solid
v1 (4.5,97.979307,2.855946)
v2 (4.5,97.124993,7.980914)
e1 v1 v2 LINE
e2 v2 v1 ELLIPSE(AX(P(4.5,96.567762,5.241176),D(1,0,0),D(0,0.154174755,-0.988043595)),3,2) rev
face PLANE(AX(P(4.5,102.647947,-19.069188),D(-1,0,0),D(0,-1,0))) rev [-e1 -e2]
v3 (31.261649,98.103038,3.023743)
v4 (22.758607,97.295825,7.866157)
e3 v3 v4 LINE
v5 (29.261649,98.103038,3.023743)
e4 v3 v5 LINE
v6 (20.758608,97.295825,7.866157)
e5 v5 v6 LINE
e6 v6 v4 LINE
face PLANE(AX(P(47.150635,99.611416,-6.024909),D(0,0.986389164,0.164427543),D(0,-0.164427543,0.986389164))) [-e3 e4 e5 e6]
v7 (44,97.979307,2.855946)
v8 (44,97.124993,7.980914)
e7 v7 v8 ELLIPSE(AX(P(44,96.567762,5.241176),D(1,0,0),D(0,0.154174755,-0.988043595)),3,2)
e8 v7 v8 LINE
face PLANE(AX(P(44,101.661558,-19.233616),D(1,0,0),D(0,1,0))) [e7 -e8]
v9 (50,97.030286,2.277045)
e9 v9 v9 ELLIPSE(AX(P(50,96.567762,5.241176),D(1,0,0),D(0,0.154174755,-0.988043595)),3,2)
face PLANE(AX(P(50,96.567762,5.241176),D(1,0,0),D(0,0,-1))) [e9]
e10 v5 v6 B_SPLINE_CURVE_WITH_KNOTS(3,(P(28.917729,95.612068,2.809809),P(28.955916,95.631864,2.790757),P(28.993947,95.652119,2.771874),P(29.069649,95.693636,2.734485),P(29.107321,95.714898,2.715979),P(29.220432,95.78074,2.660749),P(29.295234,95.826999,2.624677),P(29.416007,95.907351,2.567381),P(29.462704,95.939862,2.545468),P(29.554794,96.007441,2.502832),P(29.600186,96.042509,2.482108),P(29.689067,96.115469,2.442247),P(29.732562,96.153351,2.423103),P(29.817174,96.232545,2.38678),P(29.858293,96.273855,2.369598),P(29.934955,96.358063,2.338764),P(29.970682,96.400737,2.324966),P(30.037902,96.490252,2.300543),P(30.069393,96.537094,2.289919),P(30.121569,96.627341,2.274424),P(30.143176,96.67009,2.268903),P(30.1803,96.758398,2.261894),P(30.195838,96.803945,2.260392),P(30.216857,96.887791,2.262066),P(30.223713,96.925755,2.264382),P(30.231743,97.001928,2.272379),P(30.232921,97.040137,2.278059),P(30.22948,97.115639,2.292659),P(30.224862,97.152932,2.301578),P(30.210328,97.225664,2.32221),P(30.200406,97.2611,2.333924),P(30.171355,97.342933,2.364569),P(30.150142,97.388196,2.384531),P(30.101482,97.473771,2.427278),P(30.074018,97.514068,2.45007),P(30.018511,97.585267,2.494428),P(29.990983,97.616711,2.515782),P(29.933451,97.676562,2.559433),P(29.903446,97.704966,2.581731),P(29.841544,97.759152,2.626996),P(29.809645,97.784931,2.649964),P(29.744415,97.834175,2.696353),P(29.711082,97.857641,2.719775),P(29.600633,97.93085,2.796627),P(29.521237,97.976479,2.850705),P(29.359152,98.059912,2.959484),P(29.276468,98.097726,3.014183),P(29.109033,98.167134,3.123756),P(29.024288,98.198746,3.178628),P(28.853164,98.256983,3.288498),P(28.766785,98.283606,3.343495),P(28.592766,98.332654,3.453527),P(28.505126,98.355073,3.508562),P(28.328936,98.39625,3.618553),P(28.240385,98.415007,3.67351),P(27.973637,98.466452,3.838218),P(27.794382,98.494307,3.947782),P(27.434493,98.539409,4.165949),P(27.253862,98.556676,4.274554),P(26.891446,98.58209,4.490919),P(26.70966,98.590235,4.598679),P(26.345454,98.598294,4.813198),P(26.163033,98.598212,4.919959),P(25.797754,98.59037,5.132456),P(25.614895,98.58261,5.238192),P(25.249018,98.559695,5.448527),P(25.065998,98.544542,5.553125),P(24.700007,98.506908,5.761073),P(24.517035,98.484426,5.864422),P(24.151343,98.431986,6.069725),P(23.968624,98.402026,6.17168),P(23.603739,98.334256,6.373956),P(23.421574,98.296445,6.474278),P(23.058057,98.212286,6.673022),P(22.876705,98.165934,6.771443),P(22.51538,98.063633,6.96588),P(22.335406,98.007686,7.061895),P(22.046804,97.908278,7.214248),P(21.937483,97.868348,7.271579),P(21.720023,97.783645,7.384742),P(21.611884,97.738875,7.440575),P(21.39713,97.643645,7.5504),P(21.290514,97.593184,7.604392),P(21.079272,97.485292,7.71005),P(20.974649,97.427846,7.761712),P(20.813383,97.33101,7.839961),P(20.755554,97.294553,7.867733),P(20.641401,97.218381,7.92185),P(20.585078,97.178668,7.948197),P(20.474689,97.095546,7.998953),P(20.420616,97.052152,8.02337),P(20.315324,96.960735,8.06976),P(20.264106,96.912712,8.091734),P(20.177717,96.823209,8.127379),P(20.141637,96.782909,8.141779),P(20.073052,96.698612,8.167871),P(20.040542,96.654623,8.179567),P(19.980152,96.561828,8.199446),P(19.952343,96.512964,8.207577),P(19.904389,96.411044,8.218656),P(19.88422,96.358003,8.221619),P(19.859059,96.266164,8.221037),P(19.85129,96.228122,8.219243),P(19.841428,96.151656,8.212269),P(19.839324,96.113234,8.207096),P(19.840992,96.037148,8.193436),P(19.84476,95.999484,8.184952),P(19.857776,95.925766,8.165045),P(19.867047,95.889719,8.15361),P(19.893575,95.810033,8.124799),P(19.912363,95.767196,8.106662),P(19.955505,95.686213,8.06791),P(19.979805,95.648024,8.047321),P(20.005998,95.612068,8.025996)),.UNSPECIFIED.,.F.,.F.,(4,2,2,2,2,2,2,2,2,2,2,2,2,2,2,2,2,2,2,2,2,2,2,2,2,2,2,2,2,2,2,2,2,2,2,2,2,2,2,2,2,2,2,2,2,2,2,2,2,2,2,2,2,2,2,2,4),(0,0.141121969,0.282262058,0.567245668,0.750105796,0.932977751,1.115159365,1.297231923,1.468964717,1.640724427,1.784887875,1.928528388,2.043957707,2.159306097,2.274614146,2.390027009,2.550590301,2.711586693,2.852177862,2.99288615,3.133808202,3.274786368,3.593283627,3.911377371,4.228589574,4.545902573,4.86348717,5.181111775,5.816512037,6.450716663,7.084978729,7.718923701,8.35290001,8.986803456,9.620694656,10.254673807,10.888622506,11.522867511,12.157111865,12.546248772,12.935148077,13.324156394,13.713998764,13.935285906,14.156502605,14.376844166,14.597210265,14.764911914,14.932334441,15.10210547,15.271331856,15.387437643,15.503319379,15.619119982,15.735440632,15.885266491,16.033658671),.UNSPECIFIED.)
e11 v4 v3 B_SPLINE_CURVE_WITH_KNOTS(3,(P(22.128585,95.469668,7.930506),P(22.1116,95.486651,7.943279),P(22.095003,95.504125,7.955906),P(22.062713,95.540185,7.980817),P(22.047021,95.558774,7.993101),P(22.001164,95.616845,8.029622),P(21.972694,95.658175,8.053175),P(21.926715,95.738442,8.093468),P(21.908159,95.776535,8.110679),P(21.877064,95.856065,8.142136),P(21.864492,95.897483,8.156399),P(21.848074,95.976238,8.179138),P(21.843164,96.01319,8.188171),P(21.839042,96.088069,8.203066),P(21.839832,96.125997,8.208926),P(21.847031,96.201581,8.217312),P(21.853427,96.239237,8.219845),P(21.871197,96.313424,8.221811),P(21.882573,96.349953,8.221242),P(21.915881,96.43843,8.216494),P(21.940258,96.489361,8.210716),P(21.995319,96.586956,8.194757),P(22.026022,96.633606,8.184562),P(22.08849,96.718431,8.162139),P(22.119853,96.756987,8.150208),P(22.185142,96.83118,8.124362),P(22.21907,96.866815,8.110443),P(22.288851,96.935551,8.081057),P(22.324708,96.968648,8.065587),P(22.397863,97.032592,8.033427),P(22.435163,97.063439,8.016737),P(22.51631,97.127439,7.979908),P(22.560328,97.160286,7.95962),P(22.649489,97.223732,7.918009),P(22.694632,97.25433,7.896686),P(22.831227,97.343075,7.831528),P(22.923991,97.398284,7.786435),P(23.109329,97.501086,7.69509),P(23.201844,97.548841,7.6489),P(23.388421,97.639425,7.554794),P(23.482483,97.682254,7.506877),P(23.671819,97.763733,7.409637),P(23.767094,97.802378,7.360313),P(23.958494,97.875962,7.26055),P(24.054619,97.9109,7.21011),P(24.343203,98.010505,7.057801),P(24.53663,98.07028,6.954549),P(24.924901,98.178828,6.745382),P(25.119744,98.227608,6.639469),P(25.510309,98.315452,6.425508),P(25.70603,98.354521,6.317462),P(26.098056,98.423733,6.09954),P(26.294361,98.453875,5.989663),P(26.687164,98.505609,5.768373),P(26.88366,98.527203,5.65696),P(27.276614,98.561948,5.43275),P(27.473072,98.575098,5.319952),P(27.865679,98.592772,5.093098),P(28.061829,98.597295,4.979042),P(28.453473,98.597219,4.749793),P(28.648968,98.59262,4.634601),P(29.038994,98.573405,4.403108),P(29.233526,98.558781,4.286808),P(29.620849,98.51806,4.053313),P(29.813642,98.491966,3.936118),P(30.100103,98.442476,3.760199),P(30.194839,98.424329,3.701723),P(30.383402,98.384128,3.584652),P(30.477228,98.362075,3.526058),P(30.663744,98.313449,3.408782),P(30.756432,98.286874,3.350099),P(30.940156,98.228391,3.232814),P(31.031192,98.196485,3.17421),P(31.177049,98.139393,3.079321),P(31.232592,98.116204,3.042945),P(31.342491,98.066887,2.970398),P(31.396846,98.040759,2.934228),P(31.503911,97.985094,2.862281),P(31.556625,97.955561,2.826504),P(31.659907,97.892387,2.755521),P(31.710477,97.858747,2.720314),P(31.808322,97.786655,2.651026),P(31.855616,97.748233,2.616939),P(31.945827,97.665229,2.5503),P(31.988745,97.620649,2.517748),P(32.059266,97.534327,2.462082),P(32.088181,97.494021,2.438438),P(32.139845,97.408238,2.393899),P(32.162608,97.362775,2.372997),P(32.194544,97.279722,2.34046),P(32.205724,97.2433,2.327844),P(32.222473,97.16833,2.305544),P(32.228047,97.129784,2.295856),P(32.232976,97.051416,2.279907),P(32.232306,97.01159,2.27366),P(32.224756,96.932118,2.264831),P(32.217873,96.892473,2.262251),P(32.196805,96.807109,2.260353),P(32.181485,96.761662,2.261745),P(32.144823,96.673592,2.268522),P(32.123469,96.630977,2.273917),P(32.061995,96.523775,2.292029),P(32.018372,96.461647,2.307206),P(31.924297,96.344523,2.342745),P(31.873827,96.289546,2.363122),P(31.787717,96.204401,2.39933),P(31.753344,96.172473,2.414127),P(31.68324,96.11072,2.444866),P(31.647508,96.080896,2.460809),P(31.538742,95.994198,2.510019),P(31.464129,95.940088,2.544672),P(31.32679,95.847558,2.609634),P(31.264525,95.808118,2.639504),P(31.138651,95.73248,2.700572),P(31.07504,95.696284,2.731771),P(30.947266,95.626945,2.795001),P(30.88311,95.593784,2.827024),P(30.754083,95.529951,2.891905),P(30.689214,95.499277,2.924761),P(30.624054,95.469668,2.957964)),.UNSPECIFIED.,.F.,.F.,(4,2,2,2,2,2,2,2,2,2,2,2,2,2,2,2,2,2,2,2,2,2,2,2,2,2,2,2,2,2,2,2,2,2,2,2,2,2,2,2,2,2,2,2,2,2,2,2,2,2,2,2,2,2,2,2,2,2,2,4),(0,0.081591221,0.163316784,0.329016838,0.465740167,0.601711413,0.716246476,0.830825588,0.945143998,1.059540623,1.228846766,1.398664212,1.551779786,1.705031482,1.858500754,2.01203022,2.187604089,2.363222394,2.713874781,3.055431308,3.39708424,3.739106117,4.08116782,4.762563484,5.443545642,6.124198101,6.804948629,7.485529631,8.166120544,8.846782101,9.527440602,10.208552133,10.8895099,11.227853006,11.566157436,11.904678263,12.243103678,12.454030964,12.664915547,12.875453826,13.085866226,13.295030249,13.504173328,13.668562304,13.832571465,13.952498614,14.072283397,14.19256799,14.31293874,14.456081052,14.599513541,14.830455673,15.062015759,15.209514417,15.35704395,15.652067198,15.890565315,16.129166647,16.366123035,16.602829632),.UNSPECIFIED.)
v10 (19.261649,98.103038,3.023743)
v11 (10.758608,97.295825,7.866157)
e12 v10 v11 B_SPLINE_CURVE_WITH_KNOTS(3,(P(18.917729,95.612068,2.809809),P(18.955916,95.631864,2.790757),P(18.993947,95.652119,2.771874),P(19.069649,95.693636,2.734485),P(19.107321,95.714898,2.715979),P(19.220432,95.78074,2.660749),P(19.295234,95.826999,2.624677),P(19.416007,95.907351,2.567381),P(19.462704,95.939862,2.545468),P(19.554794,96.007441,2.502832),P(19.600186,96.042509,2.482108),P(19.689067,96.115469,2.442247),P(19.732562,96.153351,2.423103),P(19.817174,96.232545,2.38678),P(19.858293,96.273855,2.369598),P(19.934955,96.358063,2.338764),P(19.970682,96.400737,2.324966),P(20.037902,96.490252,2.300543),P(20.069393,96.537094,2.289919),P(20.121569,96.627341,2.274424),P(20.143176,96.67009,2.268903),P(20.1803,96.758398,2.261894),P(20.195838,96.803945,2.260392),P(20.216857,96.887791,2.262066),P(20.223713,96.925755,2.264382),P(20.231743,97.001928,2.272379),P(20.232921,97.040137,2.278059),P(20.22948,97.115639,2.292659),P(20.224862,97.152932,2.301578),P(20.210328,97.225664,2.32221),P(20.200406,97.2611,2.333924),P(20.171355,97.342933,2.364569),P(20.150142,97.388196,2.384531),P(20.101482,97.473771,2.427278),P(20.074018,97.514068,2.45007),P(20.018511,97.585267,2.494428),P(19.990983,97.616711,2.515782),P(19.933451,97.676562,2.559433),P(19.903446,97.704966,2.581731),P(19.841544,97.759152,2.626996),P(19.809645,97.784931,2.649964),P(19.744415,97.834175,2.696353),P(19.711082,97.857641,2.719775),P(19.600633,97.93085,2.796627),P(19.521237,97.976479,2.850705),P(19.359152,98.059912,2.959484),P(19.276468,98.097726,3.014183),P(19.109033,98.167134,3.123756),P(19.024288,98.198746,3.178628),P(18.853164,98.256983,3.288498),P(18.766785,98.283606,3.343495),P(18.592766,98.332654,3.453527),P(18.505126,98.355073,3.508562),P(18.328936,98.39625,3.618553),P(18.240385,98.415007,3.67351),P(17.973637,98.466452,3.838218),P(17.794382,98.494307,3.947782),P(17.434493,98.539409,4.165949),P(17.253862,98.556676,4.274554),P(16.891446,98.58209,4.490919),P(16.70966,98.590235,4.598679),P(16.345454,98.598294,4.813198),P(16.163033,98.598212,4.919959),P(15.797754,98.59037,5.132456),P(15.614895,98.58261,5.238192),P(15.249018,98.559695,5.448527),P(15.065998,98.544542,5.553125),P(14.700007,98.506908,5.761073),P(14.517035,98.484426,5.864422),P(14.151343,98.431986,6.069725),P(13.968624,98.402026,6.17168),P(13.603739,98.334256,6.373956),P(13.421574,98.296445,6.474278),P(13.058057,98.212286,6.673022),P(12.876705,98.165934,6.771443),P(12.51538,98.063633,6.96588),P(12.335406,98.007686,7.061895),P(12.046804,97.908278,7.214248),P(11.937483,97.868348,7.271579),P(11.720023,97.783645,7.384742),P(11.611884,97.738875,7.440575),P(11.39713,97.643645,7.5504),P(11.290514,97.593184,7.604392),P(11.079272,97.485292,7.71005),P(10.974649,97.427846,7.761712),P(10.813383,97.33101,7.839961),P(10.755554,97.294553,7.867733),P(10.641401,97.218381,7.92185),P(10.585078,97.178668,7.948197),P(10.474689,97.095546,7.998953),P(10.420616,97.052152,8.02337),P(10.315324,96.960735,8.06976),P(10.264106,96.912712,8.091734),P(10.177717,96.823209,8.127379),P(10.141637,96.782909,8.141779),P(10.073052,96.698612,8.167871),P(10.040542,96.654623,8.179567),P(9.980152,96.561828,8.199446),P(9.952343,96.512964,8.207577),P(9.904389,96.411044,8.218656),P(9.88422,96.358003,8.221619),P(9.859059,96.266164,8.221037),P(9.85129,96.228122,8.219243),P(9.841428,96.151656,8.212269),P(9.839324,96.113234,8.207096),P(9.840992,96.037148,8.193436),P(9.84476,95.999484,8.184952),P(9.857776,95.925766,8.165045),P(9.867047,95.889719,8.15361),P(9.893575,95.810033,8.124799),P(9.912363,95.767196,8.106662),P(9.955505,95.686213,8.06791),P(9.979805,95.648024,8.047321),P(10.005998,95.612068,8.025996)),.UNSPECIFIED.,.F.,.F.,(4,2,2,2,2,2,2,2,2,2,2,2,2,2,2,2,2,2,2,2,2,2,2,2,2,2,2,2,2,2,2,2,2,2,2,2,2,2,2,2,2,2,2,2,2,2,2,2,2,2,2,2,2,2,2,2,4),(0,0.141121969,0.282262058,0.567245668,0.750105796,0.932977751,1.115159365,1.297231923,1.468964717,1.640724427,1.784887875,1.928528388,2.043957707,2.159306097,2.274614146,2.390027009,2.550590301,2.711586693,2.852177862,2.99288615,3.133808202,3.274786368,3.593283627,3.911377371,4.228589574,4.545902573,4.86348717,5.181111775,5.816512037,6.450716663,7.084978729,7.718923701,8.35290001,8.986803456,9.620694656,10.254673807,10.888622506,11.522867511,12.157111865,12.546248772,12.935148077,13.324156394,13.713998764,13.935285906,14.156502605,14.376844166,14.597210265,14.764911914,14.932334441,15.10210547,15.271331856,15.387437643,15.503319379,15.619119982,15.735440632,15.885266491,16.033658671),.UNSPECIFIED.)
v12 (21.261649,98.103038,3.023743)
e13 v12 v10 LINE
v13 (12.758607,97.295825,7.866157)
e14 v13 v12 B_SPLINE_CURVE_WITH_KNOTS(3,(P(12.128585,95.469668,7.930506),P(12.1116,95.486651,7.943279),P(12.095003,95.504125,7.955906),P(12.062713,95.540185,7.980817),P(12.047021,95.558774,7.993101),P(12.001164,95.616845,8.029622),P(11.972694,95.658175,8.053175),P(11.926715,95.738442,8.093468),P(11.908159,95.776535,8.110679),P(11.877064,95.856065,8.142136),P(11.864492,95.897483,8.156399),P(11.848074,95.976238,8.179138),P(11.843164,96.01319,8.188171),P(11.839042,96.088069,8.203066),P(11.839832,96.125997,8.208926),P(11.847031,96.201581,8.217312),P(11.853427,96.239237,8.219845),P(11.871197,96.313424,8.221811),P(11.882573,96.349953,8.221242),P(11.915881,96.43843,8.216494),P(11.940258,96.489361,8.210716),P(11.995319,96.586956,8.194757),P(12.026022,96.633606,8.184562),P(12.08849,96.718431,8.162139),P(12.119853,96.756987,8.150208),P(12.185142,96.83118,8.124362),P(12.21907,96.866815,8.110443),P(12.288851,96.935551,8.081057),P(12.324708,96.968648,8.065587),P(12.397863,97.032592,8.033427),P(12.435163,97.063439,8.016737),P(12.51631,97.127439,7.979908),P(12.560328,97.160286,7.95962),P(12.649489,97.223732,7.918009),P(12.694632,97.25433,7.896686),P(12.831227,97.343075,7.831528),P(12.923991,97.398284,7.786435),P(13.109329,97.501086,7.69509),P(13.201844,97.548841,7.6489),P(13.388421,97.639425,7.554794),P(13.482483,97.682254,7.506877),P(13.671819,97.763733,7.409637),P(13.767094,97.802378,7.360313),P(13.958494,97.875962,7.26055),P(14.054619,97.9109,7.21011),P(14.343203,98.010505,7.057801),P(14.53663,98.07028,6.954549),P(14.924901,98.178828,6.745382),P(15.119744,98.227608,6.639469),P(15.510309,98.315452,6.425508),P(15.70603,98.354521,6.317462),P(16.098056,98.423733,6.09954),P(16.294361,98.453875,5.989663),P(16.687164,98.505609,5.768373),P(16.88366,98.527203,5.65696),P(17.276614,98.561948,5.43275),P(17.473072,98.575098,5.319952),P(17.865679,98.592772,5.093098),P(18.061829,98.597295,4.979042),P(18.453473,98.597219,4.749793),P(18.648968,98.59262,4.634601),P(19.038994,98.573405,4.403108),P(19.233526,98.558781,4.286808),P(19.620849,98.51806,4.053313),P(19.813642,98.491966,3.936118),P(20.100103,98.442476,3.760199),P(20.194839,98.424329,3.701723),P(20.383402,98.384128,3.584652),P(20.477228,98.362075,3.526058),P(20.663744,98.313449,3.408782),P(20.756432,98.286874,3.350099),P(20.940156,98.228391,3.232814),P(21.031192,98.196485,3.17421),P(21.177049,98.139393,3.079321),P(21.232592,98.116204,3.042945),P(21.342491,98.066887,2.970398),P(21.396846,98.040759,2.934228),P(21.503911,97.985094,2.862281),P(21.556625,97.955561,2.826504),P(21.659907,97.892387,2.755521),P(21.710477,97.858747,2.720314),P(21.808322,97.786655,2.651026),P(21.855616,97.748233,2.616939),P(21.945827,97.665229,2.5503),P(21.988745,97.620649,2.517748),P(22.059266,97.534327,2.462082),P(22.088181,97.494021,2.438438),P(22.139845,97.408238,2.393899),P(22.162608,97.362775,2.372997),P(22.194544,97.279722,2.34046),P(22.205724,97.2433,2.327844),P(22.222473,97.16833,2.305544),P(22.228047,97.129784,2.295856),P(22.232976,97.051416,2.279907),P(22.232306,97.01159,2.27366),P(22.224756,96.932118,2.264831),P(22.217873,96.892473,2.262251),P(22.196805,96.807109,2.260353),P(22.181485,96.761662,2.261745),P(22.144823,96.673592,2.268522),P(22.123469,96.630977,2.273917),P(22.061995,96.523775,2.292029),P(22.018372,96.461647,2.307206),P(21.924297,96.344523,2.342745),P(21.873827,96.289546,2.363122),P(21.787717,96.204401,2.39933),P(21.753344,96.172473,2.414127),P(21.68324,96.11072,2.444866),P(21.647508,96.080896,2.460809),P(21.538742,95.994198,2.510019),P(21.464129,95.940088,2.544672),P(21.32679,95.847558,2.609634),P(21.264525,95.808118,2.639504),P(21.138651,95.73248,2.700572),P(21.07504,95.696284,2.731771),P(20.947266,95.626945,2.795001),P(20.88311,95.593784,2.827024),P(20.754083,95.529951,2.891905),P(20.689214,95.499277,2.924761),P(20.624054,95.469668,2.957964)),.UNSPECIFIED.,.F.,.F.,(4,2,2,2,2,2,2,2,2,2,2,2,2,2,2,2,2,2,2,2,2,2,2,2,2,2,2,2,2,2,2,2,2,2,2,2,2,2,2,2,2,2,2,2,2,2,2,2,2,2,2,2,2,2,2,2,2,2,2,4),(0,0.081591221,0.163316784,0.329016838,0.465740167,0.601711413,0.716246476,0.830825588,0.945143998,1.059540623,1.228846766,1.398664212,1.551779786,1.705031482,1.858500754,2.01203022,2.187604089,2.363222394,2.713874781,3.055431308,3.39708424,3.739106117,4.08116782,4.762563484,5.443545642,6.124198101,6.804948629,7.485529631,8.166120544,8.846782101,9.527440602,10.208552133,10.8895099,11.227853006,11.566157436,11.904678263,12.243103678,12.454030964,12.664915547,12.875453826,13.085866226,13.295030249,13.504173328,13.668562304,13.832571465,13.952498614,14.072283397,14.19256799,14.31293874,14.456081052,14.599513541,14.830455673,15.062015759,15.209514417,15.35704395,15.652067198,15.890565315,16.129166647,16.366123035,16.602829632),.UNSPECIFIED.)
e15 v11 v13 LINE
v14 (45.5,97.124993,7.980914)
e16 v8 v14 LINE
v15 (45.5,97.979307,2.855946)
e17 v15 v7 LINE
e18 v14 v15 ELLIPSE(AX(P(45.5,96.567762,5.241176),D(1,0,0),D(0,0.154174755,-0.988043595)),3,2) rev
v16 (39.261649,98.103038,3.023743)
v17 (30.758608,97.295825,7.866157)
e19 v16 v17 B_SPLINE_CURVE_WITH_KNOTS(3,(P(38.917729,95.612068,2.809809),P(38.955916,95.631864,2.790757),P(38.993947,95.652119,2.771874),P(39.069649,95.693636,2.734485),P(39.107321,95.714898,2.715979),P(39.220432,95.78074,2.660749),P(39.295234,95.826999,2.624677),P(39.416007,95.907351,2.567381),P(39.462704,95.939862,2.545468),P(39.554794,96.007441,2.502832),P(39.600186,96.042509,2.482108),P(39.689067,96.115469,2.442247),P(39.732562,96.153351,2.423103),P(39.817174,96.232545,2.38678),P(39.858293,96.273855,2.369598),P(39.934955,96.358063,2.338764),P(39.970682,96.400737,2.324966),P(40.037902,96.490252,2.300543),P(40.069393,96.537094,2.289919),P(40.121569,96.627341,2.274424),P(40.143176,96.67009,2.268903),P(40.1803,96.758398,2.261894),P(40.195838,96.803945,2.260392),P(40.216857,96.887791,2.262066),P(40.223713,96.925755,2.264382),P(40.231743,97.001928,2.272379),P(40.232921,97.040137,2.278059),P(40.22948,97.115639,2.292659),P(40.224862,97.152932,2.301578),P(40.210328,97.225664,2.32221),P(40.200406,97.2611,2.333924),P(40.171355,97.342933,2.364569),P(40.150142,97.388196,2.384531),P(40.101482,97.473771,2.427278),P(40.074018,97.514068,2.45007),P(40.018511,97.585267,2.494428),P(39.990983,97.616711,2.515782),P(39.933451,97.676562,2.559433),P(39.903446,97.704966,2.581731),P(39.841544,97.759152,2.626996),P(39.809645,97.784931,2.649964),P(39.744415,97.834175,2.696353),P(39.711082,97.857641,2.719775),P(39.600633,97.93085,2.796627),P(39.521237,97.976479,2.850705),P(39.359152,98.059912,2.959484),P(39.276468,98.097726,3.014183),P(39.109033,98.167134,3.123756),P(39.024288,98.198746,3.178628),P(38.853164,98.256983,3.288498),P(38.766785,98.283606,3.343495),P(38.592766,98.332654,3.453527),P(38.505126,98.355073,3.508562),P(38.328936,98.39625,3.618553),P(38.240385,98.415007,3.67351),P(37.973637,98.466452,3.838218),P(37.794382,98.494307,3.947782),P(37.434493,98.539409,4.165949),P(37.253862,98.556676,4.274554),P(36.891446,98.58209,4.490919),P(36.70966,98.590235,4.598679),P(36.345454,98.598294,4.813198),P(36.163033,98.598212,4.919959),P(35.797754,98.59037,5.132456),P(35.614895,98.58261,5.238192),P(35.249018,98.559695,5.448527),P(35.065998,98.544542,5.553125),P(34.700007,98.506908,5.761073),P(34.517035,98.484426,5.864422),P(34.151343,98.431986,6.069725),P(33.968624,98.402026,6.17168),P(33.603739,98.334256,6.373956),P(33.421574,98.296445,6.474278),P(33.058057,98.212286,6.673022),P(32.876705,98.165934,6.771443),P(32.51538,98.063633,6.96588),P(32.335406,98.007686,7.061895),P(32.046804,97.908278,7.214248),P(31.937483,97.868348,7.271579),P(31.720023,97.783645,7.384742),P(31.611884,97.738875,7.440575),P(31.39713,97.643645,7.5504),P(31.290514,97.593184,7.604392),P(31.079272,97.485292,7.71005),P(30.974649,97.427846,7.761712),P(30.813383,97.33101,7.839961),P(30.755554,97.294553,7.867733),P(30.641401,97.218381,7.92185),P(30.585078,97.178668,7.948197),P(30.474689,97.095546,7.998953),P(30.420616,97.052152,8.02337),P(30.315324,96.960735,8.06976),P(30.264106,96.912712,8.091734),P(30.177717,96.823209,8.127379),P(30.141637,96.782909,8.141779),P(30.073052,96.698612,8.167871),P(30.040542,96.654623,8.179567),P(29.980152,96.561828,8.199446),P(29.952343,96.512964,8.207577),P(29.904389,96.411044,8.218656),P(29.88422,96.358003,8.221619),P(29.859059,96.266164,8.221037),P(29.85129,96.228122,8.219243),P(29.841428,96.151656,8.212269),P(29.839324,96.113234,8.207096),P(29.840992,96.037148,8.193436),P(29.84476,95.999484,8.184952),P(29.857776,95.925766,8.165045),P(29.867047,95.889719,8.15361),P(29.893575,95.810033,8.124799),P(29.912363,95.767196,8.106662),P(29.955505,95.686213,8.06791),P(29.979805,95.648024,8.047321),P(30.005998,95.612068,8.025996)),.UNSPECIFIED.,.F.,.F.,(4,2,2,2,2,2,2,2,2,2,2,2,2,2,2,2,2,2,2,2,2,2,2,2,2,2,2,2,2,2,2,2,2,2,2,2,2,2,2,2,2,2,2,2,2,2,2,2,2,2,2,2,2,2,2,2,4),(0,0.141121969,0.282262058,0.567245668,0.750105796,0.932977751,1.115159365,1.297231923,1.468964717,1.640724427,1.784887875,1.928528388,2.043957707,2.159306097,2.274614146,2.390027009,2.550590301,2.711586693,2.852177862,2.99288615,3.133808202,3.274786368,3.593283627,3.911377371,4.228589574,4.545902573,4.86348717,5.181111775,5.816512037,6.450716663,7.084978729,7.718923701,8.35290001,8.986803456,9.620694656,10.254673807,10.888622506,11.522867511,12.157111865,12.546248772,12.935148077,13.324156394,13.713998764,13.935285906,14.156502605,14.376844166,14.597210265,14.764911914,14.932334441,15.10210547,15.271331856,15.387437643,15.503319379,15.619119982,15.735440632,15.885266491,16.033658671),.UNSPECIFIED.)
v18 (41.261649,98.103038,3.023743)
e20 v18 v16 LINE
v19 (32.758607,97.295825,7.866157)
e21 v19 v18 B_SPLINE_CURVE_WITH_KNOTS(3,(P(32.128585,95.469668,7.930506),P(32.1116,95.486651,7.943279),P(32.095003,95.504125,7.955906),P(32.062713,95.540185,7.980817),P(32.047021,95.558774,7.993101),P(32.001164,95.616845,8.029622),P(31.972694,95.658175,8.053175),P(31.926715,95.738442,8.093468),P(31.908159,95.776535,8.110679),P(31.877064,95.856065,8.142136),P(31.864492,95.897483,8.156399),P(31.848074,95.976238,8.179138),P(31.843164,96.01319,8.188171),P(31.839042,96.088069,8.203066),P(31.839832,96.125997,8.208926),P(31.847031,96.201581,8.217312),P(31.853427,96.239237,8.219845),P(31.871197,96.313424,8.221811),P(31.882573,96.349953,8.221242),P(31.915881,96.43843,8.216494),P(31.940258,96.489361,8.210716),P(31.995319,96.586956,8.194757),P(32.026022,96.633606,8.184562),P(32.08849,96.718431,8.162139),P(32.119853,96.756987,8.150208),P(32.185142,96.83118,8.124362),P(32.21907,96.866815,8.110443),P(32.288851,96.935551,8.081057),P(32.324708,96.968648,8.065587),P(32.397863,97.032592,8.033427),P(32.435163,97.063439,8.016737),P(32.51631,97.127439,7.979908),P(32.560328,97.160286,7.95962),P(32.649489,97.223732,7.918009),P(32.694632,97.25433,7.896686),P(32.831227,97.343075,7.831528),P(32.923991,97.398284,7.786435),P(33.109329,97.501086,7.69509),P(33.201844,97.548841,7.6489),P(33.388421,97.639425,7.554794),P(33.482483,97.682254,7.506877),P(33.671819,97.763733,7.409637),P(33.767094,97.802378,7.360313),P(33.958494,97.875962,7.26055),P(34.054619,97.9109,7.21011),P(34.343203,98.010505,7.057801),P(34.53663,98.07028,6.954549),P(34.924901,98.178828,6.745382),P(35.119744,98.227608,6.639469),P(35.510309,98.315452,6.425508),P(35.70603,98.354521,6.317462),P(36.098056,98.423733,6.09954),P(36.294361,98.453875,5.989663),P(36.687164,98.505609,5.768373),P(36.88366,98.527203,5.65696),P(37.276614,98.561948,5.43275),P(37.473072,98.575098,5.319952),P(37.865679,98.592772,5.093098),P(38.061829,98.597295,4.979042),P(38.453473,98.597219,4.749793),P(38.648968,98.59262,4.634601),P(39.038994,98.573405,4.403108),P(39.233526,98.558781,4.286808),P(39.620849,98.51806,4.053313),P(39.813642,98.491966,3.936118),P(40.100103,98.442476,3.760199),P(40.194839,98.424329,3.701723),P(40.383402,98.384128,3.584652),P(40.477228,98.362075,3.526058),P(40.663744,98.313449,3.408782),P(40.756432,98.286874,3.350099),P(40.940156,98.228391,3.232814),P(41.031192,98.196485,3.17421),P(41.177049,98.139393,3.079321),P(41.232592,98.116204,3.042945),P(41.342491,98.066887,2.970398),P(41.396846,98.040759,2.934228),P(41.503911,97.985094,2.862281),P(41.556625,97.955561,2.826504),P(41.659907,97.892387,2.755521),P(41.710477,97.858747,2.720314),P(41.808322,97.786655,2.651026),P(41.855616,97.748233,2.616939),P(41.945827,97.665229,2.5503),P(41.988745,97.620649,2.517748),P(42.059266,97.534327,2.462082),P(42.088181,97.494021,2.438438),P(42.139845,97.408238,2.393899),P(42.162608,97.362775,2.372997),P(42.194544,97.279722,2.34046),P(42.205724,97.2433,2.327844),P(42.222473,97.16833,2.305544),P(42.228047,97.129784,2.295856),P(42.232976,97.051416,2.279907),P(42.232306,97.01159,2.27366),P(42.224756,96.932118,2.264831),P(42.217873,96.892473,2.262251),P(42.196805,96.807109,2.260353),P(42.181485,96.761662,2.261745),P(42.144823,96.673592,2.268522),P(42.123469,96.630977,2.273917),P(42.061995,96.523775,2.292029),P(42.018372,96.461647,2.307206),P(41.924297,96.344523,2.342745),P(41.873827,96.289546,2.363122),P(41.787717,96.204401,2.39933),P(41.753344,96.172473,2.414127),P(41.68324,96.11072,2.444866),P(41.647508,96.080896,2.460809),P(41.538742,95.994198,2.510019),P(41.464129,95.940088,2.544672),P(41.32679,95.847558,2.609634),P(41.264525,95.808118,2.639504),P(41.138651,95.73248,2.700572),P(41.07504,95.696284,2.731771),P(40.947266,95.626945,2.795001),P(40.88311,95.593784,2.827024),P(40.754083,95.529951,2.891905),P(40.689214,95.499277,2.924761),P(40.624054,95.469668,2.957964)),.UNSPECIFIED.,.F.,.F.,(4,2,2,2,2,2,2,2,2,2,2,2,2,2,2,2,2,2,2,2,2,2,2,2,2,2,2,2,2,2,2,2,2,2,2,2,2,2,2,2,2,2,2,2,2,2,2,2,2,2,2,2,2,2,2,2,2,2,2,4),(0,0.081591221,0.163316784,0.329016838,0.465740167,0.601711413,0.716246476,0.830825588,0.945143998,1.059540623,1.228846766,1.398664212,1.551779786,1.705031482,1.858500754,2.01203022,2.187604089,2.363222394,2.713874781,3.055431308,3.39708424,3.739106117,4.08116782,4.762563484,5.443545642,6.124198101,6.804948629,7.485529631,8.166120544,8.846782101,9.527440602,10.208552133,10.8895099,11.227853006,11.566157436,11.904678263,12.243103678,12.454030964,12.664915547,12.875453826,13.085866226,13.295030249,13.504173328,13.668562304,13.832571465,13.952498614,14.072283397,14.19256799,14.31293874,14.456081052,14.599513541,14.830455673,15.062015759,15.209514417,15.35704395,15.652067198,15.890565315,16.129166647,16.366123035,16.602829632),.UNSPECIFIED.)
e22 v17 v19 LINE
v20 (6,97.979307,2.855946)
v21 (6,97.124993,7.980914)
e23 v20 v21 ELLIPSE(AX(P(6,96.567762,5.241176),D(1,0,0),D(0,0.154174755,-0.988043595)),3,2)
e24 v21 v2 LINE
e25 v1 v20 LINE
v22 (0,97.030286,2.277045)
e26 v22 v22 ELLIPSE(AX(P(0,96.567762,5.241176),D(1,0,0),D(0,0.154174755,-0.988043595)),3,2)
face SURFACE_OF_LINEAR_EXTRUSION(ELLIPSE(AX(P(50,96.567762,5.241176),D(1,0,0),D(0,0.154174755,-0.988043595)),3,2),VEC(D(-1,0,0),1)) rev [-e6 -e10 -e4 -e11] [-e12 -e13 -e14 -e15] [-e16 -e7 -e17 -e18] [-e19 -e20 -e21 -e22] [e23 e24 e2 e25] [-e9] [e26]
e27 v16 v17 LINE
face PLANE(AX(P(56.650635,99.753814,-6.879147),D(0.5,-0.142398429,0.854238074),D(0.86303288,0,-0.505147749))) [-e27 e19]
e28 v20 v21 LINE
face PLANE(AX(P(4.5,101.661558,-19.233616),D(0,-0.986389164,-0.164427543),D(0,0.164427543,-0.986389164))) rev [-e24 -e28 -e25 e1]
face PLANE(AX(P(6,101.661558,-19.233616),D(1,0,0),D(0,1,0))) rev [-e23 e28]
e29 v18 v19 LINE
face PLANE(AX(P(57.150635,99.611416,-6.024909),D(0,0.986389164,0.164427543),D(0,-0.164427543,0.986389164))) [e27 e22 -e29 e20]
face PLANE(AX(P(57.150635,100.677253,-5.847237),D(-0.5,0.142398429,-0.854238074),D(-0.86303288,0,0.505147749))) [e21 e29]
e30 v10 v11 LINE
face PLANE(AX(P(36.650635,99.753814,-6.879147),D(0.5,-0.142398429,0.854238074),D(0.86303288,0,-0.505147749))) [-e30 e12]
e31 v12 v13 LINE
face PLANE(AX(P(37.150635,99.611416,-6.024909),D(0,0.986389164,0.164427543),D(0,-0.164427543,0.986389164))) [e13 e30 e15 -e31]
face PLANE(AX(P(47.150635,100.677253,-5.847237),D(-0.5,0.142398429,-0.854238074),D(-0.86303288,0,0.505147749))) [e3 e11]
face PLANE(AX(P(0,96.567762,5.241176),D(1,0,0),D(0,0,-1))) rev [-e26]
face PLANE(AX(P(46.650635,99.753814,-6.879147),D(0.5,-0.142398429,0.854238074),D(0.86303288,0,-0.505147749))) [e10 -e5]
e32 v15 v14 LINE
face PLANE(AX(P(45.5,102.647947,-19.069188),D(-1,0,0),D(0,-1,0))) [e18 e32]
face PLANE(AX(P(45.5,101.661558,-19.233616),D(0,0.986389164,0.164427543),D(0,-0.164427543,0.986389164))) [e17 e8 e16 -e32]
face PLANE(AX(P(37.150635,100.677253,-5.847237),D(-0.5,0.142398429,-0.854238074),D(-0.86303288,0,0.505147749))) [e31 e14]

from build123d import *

# Parameters (mm, degrees)
SKETCH_2_RX            = 3
SKETCH_2_RY            = 2
EXTRUDE_1_DEPTH        = 50
SKETCH_5_W             = 1.5
SKETCH_5_H             = 1
CUT_EXTRUDE_2_DEPTH    = 25
CUT_EXTRUDE_4_DEPTH    = 25
PATTERN_START          = 97.264960027
PATTERN_LINEAR_1_DEPTH = 0.850363271
PATTERN_LINEAR_2_DEPTH = 0.850363271


# Read off the part's stored shape, not the designer's step: 阵列(线性)1, 阵列(线性)2
with BuildPart() as part:
    # 草图2 → 凸台-拉伸1 (new body)
    with BuildSketch(Plane(origin=(0, 0, 0), x_dir=(0, 0, -1), z_dir=(1, 0, 0))):
        with Locations(Location((-5.2411758, 96.567762113), (0, 0, 8.868937921))):
            Ellipse(SKETCH_2_RX, SKETCH_2_RY)
    extrude(amount=EXTRUDE_1_DEPTH)

    # 草图5 → 切除-拉伸2 (cut, symmetric)
    with BuildSketch(Plane(origin=(0, 1.757367098, -10.542320534), x_dir=(1, 0, 0), z_dir=(0, -0.1644275429715825, 0.986389164129619))):
        with Locations((5.25, 97.615322624)):
            Rectangle(SKETCH_5_W, SKETCH_5_H)
    cut_extrude_2 = extrude(amount=CUT_EXTRUDE_2_DEPTH, both=True, mode=Mode.SUBTRACT)

    # 镜向2: 切除-拉伸2 across plane
    add(cut_extrude_2.mirror(Plane(origin=(25, 0, 0), x_dir=(0, 0, 1), z_dir=(1, 0, 0))), mode=Mode.SUBTRACT)

    # 草图7 → 切除-拉伸4 (cut, symmetric)
    with BuildSketch(Plane(origin=(23.377948952, 2.219322141, -13.31355606), x_dir=(0.49999999999999795, -0.14239842929524804, 0.8542380741539494), z_dir=(-0.8660254037844399, -0.0822137714857909, 0.4931945820648075))):
        Polygon((3.244102096, 98.345137773), (4.244102028, 98.34550487), (4.244102028, 97.264960027), (3.244102096, 97.264960027), align=None)
    extrude(amount=CUT_EXTRUDE_4_DEPTH, both=True, mode=Mode.SUBTRACT)

    # 阵列(线性)1 outline → 阵列(线性)1 (cut)
    with BuildSketch(Plane(origin=(0, 0, 0), x_dir=(1, 0, 0), z_dir=(0, 0.986389164129618, 0.164427542971589)).offset(PATTERN_START)):
        Polygon((32.758607465, 8.239021249), (41.261648564, 13.148254316), (43, 14.151891985), (43, 15), (42.468966305, 15), (39.261648698, 13.148254316), (30.7586076, 8.239021249), (29, 7.223688678), (29, 7), (30.61255971, 7), align=None)
    extrude(amount=PATTERN_LINEAR_1_DEPTH, mode=Mode.SUBTRACT)

    # 阵列(线性)2 outline → 阵列(线性)2 (cut)
    with BuildSketch(Plane(origin=(0, 0, 0), x_dir=(1, 0, 0), z_dir=(0, 0.986389164129618, 0.164427542971589)).offset(PATTERN_START)):
        Polygon((12.758607465, 8.239021249), (21.261648564, 13.148254316), (23, 14.151891985), (23, 15), (22.468966305, 15), (19.261648698, 13.148254316), (10.7586076, 8.239021249), (9, 7.223688678), (9, 7), (10.61255971, 7), align=None)
    extrude(amount=PATTERN_LINEAR_2_DEPTH, mode=Mode.SUBTRACT)


solid = part.part
